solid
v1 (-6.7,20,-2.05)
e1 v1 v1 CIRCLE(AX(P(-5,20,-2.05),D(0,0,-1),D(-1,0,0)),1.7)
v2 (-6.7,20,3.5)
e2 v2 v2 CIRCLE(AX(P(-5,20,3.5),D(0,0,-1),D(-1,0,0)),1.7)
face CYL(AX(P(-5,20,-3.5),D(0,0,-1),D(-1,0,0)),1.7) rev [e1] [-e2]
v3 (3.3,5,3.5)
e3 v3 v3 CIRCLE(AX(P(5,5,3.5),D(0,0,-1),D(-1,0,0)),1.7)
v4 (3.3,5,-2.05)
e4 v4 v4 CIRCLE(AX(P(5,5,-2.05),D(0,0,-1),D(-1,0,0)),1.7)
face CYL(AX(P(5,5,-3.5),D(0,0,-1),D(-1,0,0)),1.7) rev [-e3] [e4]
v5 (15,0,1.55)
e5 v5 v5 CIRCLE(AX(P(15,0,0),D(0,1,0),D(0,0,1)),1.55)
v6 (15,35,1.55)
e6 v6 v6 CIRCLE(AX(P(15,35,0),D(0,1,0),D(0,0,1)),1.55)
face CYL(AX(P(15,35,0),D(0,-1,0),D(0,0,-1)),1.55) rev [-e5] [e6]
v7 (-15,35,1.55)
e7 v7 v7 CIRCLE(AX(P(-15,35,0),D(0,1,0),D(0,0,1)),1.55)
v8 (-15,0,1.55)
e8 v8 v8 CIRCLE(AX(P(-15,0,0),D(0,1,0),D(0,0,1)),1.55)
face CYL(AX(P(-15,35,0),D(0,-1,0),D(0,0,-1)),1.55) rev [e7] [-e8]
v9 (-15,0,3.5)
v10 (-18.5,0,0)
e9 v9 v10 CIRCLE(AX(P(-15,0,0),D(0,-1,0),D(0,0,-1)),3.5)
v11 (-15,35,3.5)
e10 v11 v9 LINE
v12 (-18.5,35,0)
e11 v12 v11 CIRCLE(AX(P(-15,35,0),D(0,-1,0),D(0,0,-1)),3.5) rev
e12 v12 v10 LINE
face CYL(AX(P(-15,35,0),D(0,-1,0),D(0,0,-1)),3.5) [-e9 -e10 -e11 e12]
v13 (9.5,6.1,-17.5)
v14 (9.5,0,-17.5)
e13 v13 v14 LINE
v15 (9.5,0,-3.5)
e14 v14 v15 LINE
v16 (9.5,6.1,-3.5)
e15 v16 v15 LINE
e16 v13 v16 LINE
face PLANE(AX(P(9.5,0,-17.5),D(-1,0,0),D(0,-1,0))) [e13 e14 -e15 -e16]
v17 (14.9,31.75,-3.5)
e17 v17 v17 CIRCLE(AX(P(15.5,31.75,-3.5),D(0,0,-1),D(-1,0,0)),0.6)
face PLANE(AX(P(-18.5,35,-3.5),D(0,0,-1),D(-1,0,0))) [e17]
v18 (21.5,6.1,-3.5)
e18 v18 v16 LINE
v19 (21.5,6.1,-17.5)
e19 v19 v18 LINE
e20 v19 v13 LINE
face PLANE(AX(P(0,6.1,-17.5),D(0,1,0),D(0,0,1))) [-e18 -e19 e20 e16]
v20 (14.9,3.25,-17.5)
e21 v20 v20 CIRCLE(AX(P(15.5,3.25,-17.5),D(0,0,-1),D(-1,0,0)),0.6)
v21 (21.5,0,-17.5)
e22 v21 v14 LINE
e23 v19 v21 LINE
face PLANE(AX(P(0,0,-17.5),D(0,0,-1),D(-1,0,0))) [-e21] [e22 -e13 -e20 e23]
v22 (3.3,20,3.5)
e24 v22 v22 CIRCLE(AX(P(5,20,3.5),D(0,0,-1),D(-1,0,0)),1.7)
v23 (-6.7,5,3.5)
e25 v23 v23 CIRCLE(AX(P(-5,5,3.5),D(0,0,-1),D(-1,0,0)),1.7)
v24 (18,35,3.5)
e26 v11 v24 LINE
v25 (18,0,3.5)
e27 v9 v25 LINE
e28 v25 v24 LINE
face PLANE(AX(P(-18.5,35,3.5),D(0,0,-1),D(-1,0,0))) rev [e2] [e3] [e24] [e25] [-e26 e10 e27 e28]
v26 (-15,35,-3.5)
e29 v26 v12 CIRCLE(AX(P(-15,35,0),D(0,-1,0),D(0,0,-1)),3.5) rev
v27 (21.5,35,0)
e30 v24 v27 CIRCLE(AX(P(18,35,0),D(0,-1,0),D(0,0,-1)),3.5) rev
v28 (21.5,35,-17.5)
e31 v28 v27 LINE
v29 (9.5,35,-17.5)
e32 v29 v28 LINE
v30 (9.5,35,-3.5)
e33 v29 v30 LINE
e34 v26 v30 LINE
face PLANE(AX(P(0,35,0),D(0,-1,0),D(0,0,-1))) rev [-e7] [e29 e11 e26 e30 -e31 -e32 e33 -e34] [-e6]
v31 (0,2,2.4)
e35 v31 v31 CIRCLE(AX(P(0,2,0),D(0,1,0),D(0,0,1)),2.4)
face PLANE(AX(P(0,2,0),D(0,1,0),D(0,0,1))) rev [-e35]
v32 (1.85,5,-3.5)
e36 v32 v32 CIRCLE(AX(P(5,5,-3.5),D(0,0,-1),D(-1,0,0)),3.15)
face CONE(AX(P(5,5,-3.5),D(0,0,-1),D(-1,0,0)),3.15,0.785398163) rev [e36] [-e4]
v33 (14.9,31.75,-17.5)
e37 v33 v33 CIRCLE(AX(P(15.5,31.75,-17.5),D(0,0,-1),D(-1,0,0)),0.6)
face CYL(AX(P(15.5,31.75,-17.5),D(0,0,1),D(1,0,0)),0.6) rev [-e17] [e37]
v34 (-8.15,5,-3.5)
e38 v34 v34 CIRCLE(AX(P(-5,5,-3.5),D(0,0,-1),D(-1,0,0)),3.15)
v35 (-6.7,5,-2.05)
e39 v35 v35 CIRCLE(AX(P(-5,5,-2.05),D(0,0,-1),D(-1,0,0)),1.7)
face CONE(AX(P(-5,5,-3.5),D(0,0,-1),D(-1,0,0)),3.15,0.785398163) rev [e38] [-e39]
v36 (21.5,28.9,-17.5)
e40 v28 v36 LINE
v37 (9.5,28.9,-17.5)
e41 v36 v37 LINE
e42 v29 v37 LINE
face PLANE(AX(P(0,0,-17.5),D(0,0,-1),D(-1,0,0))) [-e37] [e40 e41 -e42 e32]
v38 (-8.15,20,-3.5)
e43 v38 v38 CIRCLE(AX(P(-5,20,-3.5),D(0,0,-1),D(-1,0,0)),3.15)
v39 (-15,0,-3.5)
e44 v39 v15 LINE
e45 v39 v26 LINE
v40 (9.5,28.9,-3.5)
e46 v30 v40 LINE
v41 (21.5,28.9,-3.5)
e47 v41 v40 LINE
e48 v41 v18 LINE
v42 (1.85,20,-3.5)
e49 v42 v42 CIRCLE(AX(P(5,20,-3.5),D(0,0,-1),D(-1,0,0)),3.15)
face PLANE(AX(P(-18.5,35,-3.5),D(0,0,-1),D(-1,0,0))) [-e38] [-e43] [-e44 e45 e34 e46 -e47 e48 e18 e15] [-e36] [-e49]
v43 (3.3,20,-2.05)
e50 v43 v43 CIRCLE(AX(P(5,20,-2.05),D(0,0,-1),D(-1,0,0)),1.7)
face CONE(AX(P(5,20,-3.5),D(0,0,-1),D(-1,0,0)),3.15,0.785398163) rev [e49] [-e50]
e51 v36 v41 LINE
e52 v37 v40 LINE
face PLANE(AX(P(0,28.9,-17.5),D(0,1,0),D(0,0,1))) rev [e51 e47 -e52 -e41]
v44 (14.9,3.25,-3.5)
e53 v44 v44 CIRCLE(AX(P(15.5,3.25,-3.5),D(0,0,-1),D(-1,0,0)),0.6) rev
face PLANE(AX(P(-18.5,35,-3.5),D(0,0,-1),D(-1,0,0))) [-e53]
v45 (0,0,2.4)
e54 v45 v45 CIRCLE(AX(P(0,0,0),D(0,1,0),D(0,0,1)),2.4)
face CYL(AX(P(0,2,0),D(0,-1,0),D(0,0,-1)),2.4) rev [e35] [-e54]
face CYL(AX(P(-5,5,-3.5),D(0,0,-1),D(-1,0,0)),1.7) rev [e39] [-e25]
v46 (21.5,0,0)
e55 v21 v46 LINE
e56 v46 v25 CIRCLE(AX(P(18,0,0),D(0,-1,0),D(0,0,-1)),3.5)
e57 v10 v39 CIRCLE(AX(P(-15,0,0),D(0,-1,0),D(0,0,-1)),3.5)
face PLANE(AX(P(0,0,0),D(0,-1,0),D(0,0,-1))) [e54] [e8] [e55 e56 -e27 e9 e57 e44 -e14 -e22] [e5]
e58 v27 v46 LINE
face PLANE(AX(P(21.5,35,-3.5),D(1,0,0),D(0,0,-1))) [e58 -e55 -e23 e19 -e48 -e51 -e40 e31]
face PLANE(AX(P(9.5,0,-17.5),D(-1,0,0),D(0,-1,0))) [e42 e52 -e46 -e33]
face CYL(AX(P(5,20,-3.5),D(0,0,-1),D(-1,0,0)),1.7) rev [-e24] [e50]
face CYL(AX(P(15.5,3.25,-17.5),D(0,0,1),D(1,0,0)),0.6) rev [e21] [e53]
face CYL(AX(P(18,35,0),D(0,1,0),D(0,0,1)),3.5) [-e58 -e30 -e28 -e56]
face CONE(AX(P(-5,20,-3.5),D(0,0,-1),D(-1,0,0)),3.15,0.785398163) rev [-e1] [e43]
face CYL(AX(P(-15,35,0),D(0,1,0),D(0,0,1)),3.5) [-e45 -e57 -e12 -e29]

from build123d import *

# Parameters (mm, degrees)
SKIZZE1_W                                            = 40
SKIZZE1_H                                            = 7
AUFSATZ_LINEAR_AUSTRAGEN1_DEPTH                      = 35
SKIZZE2_W                                            = 12
SKIZZE2_H                                            = 6.1
SKIZZE2_R                                            = 0.6
AUFSATZ_LINEAR_AUSTRAGEN2_DEPTH                      = 14
FORMSENKUNG_F_R_M3_SENKSCHRAUBE_MIT_SCHL_D           = 3.4
FORMSENKUNG_F_R_M3_SENKSCHRAUBE_MIT_SCHL_CSINK_D     = 6.3
FORMSENKUNG_F_R_M3_SENKSCHRAUBE_MIT_SCHL_CSINK_ANGLE = 90
VERRUNDUNG1_R                                        = 3.5
SCHNITT_LINEAR_AUSTRAGEN1_DEPTH                      = 45.648628198
SCHNITT_LINEAR_AUSTRAGEN2_DEPTH                      = 2


with BuildPart() as part:
    # Skizze1 → Aufsatz-Linear austragen1 (new body)
    with BuildSketch(Plane(origin=(0, 0, 0), x_dir=(1, 0, 0), z_dir=(0, 1, 0))):
        with Locations((1.5, 0)):
            Rectangle(SKIZZE1_W, SKIZZE1_H)
    extrude(amount=AUFSATZ_LINEAR_AUSTRAGEN1_DEPTH)

    # Skizze2 → Aufsatz-Linear austragen2 (add)
    # profile 1 of 2: a face of its own
    with BuildSketch(Plane(origin=(0, 0, -3.5), x_dir=(-1, 0, 0), z_dir=(0, 0, -1))):
        with Locations((-15.5, 31.95)):
            Rectangle(SKIZZE2_W, SKIZZE2_H)
        with Locations((-15.5, 31.75)):
            Circle(SKIZZE2_R, mode=Mode.SUBTRACT)
    # profile 2 of 2: a face of its own
    with BuildSketch(Plane(origin=(0, 0, -3.5), x_dir=(-1, 0, 0), z_dir=(0, 0, -1))):
        with Locations((-15.5, 3.05)):
            Rectangle(SKIZZE2_W, SKIZZE2_H)
        with Locations((-15.5, 3.25)):
            Circle(SKIZZE2_R, mode=Mode.SUBTRACT)
    extrude(amount=AUFSATZ_LINEAR_AUSTRAGEN2_DEPTH)

    # Formsenkung für M3 Senkschraube mit Schlitz/Kreuzschlitz1 (through all)
    with Locations(Plane(origin=(0, 0, -3.5), x_dir=(-1, 0, 0), z_dir=(0, 0, -1))):
        with Locations((-5, 20), (5, 20), (5, 5), (-5, 5)):
            CounterSinkHole(FORMSENKUNG_F_R_M3_SENKSCHRAUBE_MIT_SCHL_D / 2, FORMSENKUNG_F_R_M3_SENKSCHRAUBE_MIT_SCHL_CSINK_D / 2, counter_sink_angle=FORMSENKUNG_F_R_M3_SENKSCHRAUBE_MIT_SCHL_CSINK_ANGLE)

    # Verrundung1
    verrundung1_edges = [part.edges().sort_by_distance(p)[0] for p in [
        (21.5, 17.5, 3.5),
        (-18.5, 17.5, 3.5),
        (-18.5, 17.5, -3.5),
    ]]
    fillet(verrundung1_edges, radius=VERRUNDUNG1_R - 0.0001)  # a hair under: the kernel refuses the full size

    # Skizze1<5> → Schnitt-Linear austragen1 (cut, through all)
    with BuildSketch(Plane(origin=(0, 0, 0), x_dir=(1, 0, 0), z_dir=(0, 1, 0))):
        with BuildLine():
            ThreePointArc((13.45, 0), (15, -1.55), (16.55, 0))
            Line((16.55, 0), (13.45, 0))
        make_face()
        with BuildLine():
            Line((13.45, 0), (16.55, 0))
            ThreePointArc((16.55, 0), (15, 1.55), (13.45, 0))
        make_face()
        with BuildLine():
            ThreePointArc((-16.55, 0), (-15, -1.55), (-13.45, 0))
            Line((-13.45, 0), (-16.55, 0))
        make_face()
        with BuildLine():
            Line((-16.55, 0), (-13.45, 0))
            ThreePointArc((-13.45, 0), (-15, 1.55), (-16.55, 0))
        make_face()
    extrude(amount=SCHNITT_LINEAR_AUSTRAGEN1_DEPTH, mode=Mode.SUBTRACT)

    # Skizze1<7> → Schnitt-Linear austragen2 (cut)
    with BuildSketch(Plane(origin=(0, 0, 0), x_dir=(1, 0, 0), z_dir=(0, 1, 0))):
        with BuildLine():
            ThreePointArc((-2.4, 0), (0, -2.4), (2.4, 0))
            Line((2.4, 0), (-2.4, 0))
        make_face()
        with BuildLine():
            Line((-2.4, 0), (2.4, 0))
            ThreePointArc((2.4, 0), (0, 2.4), (-2.4, 0))
        make_face()
    extrude(amount=SCHNITT_LINEAR_AUSTRAGEN2_DEPTH, mode=Mode.SUBTRACT)


solid = part.part
